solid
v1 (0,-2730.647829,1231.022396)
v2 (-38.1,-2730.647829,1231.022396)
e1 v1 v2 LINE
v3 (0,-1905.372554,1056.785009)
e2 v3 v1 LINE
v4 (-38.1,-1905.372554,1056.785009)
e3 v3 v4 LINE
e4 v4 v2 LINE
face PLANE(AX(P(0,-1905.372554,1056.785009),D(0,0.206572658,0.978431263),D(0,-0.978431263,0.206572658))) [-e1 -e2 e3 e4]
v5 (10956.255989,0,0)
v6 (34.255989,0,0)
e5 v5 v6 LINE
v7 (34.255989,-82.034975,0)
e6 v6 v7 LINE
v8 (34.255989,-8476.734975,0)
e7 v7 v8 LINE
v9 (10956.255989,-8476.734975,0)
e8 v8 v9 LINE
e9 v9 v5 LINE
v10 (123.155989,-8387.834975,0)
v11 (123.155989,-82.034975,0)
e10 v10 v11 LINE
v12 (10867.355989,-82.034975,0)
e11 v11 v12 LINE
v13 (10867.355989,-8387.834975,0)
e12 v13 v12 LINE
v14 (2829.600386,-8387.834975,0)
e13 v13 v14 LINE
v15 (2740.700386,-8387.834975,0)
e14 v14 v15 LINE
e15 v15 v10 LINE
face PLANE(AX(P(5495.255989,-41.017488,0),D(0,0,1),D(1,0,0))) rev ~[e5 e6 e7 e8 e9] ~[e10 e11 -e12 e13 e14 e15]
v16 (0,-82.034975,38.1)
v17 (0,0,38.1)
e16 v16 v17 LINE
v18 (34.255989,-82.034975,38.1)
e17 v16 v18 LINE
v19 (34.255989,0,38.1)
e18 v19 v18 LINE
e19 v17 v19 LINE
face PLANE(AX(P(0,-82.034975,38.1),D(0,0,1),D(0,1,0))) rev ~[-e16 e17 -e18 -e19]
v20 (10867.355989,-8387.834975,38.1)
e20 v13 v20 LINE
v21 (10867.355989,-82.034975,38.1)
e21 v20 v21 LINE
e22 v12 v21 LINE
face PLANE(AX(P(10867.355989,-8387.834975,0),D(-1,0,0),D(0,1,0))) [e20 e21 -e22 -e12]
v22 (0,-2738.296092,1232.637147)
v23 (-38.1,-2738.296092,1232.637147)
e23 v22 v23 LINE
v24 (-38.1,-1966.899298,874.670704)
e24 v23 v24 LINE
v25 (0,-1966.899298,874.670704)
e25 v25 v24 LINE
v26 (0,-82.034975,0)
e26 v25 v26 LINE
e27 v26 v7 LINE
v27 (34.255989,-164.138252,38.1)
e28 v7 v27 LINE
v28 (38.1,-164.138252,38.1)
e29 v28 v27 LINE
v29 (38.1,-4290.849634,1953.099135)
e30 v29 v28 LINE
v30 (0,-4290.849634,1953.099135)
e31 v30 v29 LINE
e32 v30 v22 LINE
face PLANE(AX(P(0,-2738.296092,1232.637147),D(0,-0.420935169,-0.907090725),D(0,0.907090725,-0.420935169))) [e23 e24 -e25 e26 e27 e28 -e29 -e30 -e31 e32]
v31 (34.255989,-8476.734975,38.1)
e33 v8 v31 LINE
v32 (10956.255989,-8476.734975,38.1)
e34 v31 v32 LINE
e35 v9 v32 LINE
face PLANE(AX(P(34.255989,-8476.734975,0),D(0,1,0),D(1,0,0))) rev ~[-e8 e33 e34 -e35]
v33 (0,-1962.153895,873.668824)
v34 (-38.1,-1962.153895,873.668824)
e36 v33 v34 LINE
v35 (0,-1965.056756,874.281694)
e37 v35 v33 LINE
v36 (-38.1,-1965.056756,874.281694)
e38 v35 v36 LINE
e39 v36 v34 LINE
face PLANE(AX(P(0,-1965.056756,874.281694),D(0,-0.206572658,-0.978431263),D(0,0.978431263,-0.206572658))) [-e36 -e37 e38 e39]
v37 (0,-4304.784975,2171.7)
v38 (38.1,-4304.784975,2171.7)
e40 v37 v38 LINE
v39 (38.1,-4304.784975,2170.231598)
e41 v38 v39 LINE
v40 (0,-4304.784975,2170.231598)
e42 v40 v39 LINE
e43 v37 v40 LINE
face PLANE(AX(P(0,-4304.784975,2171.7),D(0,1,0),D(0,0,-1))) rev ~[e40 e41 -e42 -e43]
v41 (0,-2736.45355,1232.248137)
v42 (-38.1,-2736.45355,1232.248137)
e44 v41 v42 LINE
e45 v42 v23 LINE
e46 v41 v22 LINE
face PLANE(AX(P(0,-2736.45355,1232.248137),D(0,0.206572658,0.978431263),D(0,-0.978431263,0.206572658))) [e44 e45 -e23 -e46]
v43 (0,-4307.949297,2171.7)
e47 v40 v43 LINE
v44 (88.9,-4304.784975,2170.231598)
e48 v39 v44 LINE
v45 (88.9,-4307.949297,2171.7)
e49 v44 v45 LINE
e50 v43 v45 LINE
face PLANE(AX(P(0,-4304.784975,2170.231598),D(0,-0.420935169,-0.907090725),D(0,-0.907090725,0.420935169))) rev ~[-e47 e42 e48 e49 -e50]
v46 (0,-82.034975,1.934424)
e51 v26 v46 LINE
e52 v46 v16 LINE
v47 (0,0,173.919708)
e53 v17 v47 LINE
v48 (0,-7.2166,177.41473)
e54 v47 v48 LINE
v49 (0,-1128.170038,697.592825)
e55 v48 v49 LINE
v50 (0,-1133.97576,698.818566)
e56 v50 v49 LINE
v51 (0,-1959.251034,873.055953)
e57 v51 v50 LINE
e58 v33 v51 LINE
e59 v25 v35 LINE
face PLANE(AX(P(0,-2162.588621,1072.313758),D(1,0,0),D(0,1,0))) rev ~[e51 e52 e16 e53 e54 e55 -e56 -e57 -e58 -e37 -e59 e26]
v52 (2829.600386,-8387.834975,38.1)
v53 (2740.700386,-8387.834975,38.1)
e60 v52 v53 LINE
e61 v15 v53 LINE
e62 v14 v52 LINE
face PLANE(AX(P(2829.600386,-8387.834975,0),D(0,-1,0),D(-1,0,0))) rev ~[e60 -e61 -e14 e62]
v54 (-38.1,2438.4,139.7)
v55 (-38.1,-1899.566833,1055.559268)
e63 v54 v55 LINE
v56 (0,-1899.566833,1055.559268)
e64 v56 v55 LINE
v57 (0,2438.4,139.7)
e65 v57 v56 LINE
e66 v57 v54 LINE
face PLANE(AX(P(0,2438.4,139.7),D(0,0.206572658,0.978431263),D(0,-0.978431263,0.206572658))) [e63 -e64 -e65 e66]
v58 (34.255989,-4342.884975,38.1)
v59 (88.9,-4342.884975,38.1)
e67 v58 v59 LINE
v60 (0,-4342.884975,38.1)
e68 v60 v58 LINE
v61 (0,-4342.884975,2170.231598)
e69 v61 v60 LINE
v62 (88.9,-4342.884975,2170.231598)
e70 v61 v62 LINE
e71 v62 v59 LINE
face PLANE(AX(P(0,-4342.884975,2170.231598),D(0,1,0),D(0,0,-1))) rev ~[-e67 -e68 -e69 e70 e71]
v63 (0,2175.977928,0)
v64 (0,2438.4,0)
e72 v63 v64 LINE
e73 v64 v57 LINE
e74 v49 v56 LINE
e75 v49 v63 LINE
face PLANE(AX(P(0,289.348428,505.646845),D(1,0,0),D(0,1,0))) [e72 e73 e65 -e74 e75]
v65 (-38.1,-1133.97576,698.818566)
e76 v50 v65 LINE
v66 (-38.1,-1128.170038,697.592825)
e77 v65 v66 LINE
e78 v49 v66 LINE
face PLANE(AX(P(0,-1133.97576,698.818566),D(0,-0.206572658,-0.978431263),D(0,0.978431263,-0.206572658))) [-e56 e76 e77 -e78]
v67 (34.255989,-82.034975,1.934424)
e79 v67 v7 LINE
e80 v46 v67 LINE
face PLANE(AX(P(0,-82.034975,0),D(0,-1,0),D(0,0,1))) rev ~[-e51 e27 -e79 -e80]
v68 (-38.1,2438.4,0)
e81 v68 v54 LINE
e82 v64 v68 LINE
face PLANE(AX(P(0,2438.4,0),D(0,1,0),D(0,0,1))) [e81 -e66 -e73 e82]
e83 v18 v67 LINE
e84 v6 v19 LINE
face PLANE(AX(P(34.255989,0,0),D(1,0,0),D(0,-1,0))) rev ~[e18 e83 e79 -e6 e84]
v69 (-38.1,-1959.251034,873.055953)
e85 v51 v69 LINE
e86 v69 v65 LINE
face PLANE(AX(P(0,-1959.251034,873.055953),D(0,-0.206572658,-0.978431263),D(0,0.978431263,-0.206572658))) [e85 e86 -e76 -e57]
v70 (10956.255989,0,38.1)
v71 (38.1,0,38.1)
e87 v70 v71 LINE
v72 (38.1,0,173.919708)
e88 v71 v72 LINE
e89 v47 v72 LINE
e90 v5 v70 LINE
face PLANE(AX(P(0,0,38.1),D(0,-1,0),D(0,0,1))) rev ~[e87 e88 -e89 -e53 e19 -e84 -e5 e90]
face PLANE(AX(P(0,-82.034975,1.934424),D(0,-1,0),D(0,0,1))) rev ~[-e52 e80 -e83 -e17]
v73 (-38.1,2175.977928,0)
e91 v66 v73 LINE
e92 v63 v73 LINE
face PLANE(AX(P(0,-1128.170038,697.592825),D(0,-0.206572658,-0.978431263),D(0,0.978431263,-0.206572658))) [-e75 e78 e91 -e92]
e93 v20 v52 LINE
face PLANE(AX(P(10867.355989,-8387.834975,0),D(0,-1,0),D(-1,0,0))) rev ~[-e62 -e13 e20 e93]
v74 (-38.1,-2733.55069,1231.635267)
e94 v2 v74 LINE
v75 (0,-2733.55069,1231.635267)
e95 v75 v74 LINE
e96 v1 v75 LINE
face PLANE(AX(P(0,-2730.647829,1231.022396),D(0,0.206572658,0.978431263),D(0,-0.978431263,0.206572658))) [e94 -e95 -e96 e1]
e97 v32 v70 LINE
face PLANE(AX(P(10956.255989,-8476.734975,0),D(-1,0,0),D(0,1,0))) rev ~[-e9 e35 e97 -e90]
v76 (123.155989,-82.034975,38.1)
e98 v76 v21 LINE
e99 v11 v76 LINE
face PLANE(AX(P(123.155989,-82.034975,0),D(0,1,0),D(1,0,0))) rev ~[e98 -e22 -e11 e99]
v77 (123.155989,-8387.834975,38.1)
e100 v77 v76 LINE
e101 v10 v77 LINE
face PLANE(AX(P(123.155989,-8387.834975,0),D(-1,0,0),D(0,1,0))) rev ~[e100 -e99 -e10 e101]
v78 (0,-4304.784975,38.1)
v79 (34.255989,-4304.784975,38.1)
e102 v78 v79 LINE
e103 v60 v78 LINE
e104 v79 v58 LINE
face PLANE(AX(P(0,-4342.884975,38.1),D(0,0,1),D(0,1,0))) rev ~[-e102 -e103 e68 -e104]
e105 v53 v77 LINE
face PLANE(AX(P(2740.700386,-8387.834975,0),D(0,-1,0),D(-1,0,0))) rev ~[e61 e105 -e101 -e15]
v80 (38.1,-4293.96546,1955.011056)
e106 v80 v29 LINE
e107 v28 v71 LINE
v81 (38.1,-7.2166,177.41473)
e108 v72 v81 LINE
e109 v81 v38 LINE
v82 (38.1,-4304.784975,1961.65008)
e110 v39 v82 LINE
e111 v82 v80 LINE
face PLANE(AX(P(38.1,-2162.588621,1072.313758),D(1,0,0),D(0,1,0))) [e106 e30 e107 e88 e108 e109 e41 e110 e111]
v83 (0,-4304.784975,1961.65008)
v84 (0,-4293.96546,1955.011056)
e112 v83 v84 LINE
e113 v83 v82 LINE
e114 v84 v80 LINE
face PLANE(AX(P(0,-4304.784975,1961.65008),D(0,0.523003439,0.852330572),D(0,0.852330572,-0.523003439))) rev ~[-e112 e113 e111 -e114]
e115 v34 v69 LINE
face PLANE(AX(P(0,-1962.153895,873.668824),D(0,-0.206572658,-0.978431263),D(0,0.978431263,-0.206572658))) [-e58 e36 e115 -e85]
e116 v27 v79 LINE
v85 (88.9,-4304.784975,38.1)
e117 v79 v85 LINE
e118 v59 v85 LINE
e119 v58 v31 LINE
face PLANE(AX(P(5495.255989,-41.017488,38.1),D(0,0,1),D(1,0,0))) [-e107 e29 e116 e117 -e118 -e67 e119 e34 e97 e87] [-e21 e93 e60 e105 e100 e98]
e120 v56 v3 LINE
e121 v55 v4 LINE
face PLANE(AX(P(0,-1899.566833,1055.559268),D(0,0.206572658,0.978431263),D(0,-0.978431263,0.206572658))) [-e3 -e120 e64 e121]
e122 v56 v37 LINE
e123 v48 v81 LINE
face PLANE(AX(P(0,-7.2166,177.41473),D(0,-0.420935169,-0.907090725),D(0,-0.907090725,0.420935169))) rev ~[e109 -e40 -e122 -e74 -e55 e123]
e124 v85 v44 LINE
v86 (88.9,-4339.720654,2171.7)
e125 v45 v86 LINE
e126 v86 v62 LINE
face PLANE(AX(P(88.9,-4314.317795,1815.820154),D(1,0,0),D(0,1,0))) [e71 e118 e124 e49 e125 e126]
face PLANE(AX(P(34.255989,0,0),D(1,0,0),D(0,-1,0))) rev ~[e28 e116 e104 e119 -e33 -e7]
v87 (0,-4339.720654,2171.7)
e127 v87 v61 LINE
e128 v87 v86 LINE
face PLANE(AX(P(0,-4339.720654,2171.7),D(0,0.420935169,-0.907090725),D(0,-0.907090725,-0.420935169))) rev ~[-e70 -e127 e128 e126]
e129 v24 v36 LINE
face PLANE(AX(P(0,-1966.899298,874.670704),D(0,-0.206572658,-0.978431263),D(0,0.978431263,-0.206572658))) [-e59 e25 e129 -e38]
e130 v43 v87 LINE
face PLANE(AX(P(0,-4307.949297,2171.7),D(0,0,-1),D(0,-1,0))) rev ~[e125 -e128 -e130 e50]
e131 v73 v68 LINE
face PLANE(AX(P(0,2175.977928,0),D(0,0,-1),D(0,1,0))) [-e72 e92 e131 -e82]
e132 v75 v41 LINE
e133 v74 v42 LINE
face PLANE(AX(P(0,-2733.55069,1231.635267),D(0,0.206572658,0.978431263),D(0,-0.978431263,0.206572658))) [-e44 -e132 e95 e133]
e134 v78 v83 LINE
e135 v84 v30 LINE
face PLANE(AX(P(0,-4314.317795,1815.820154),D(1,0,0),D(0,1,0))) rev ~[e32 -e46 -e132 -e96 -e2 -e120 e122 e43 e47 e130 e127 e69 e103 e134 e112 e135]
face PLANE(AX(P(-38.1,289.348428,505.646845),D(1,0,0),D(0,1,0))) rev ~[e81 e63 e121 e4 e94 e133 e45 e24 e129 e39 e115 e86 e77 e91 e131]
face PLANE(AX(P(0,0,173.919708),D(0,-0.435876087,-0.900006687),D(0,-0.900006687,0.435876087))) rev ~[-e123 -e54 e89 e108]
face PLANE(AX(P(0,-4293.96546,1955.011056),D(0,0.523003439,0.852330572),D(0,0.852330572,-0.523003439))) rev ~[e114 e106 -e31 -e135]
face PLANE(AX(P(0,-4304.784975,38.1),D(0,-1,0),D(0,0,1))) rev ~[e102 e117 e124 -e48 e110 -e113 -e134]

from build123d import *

# Parameters (mm, degrees)
F0_W     = 88.9
F0_H     = 8305.8
F1_DEPTH = 38.1
F3_DEPTH = 38.1
F6_DEPTH = 38.1
F2_W     = 19.05
F2_H     = 1422.4
F7_DEPTH = 88.9


with BuildPart() as f1:
    # F0 (on Top) → F1 (new body)
    with BuildSketch(Plane.XY):
        Polygon((34.2559893398, 0), (34.2559893398, -82.0349754334), (123.1559893398, -82.0349754333), (2774.9563753398, -82.0349754333), (2863.8563753398, -82.0349754333), (10867.3559893398, -82.0349754333), (10956.2559893398, -82.0349754333), (10956.2559893398, 0), align=None)
        with Locations((78.7059893398, -4234.9349754334)):
            Rectangle(F0_W, F0_H)
        Polygon((123.1559893398, -8387.8349754334), (34.2559893398, -8387.8349754334), (34.2559893398, -8476.7349754334), (10956.2559893398, -8476.7349754334), (10956.2559893398, -8387.8349754334), (10867.3559893398, -8387.8349754334), (2829.600386, -8387.8349754334), (2740.700386, -8387.8349754333), align=None)
        with Locations((10911.8059893398, -4234.9349754334)):
            Rectangle(F0_W, F0_H)
    extrude(amount=F1_DEPTH)

    # F2 (on Right) → F3 (join)
    with BuildSketch(Plane.YZ):
        Polygon((-4304.7849754334, 2170.231597737), (-4304.7849754334, 1961.6500800771), (-4293.965460335, 1955.0110555127), (-4290.8496340128, 1953.0991354956), (-82.0349754333, 0), (-82.0349754334, 1.9344240427), (-82.0349754334, 38.1), (0, 38.1), (0, 162.5593582531), (0, 173.9197075367), (-7.2166001264, 177.4147298146), (-4304.7849754334, 2171.7), (-4304.7849754334, 2170.9657988685), align=None)
    extrude(amount=F3_DEPTH)

    # F5 (on face) → F6 (join)
    with BuildSketch(Plane.YZ):
        Polygon((2175.9779277023, 0), (2438.4, 0), (2438.4, 139.7), (-1899.566832523, 1055.559267592), (-1128.1700381134, 697.5928246615), align=None)
        Polygon((-1128.1700381134, 697.5928246615), (-1899.566832523, 1055.559267592), (-1902.4696932972, 1056.1721381014), (-1131.0728988876, 698.2056951709), align=None)
        Polygon((-1131.0728988876, 698.2056951709), (-1902.4696932972, 1056.1721381014), (-1905.3725540714, 1056.7850086108), (-1133.9757596618, 698.8185656803), align=None)
        Polygon((-1133.9757596618, 698.8185656803), (-1905.3725540714, 1056.7850086108), (-2730.6478288415, 1231.0223962843), (-1959.2510344318, 873.0559533537), align=None)
        Polygon((-1959.2510344318, 873.0559533537), (-2730.6478288415, 1231.0223962843), (-2733.5506896157, 1231.6352667937), (-1962.153895206, 873.6688238632), align=None)
        Polygon((-1962.153895206, 873.6688238632), (-2733.5506896157, 1231.6352667937), (-2736.4535503898, 1232.2481373031), (-1965.0567559802, 874.2816943726), align=None)
        Polygon((-1965.0567559802, 874.2816943726), (-2736.4535503898, 1232.2481373031), (-2738.2960922849, 1232.6371465177), (-1966.8992978753, 874.6707035872), align=None)
    extrude(amount=-F6_DEPTH)

    # F2 (on Right) → F7 (join)
    with BuildSketch(Plane.YZ):
        Polygon((-4323.8349754334, 1460.5), (-4304.7849754334, 1460.5), (-4304.7849754334, 1961.6500800771), (-4304.7849754334, 2170.231597737), (-4307.9492966175, 2171.7), (-4323.8349754334, 2171.7), align=None)
        Polygon((-4342.8849754334, 1460.5), (-4323.8349754334, 1460.5), (-4323.8349754334, 2171.7), (-4339.7206542492, 2171.7), (-4342.8849754334, 2170.231597737), (-4342.8849754334, 1961.6500800771), align=None)
        with Locations((-4314.3099754334, 749.3)):
            Rectangle(F2_W, F2_H)
        with Locations((-4333.3599754334, 749.3)):
            Rectangle(F2_W, F2_H)
    extrude(amount=F7_DEPTH)


solid = f1.part
